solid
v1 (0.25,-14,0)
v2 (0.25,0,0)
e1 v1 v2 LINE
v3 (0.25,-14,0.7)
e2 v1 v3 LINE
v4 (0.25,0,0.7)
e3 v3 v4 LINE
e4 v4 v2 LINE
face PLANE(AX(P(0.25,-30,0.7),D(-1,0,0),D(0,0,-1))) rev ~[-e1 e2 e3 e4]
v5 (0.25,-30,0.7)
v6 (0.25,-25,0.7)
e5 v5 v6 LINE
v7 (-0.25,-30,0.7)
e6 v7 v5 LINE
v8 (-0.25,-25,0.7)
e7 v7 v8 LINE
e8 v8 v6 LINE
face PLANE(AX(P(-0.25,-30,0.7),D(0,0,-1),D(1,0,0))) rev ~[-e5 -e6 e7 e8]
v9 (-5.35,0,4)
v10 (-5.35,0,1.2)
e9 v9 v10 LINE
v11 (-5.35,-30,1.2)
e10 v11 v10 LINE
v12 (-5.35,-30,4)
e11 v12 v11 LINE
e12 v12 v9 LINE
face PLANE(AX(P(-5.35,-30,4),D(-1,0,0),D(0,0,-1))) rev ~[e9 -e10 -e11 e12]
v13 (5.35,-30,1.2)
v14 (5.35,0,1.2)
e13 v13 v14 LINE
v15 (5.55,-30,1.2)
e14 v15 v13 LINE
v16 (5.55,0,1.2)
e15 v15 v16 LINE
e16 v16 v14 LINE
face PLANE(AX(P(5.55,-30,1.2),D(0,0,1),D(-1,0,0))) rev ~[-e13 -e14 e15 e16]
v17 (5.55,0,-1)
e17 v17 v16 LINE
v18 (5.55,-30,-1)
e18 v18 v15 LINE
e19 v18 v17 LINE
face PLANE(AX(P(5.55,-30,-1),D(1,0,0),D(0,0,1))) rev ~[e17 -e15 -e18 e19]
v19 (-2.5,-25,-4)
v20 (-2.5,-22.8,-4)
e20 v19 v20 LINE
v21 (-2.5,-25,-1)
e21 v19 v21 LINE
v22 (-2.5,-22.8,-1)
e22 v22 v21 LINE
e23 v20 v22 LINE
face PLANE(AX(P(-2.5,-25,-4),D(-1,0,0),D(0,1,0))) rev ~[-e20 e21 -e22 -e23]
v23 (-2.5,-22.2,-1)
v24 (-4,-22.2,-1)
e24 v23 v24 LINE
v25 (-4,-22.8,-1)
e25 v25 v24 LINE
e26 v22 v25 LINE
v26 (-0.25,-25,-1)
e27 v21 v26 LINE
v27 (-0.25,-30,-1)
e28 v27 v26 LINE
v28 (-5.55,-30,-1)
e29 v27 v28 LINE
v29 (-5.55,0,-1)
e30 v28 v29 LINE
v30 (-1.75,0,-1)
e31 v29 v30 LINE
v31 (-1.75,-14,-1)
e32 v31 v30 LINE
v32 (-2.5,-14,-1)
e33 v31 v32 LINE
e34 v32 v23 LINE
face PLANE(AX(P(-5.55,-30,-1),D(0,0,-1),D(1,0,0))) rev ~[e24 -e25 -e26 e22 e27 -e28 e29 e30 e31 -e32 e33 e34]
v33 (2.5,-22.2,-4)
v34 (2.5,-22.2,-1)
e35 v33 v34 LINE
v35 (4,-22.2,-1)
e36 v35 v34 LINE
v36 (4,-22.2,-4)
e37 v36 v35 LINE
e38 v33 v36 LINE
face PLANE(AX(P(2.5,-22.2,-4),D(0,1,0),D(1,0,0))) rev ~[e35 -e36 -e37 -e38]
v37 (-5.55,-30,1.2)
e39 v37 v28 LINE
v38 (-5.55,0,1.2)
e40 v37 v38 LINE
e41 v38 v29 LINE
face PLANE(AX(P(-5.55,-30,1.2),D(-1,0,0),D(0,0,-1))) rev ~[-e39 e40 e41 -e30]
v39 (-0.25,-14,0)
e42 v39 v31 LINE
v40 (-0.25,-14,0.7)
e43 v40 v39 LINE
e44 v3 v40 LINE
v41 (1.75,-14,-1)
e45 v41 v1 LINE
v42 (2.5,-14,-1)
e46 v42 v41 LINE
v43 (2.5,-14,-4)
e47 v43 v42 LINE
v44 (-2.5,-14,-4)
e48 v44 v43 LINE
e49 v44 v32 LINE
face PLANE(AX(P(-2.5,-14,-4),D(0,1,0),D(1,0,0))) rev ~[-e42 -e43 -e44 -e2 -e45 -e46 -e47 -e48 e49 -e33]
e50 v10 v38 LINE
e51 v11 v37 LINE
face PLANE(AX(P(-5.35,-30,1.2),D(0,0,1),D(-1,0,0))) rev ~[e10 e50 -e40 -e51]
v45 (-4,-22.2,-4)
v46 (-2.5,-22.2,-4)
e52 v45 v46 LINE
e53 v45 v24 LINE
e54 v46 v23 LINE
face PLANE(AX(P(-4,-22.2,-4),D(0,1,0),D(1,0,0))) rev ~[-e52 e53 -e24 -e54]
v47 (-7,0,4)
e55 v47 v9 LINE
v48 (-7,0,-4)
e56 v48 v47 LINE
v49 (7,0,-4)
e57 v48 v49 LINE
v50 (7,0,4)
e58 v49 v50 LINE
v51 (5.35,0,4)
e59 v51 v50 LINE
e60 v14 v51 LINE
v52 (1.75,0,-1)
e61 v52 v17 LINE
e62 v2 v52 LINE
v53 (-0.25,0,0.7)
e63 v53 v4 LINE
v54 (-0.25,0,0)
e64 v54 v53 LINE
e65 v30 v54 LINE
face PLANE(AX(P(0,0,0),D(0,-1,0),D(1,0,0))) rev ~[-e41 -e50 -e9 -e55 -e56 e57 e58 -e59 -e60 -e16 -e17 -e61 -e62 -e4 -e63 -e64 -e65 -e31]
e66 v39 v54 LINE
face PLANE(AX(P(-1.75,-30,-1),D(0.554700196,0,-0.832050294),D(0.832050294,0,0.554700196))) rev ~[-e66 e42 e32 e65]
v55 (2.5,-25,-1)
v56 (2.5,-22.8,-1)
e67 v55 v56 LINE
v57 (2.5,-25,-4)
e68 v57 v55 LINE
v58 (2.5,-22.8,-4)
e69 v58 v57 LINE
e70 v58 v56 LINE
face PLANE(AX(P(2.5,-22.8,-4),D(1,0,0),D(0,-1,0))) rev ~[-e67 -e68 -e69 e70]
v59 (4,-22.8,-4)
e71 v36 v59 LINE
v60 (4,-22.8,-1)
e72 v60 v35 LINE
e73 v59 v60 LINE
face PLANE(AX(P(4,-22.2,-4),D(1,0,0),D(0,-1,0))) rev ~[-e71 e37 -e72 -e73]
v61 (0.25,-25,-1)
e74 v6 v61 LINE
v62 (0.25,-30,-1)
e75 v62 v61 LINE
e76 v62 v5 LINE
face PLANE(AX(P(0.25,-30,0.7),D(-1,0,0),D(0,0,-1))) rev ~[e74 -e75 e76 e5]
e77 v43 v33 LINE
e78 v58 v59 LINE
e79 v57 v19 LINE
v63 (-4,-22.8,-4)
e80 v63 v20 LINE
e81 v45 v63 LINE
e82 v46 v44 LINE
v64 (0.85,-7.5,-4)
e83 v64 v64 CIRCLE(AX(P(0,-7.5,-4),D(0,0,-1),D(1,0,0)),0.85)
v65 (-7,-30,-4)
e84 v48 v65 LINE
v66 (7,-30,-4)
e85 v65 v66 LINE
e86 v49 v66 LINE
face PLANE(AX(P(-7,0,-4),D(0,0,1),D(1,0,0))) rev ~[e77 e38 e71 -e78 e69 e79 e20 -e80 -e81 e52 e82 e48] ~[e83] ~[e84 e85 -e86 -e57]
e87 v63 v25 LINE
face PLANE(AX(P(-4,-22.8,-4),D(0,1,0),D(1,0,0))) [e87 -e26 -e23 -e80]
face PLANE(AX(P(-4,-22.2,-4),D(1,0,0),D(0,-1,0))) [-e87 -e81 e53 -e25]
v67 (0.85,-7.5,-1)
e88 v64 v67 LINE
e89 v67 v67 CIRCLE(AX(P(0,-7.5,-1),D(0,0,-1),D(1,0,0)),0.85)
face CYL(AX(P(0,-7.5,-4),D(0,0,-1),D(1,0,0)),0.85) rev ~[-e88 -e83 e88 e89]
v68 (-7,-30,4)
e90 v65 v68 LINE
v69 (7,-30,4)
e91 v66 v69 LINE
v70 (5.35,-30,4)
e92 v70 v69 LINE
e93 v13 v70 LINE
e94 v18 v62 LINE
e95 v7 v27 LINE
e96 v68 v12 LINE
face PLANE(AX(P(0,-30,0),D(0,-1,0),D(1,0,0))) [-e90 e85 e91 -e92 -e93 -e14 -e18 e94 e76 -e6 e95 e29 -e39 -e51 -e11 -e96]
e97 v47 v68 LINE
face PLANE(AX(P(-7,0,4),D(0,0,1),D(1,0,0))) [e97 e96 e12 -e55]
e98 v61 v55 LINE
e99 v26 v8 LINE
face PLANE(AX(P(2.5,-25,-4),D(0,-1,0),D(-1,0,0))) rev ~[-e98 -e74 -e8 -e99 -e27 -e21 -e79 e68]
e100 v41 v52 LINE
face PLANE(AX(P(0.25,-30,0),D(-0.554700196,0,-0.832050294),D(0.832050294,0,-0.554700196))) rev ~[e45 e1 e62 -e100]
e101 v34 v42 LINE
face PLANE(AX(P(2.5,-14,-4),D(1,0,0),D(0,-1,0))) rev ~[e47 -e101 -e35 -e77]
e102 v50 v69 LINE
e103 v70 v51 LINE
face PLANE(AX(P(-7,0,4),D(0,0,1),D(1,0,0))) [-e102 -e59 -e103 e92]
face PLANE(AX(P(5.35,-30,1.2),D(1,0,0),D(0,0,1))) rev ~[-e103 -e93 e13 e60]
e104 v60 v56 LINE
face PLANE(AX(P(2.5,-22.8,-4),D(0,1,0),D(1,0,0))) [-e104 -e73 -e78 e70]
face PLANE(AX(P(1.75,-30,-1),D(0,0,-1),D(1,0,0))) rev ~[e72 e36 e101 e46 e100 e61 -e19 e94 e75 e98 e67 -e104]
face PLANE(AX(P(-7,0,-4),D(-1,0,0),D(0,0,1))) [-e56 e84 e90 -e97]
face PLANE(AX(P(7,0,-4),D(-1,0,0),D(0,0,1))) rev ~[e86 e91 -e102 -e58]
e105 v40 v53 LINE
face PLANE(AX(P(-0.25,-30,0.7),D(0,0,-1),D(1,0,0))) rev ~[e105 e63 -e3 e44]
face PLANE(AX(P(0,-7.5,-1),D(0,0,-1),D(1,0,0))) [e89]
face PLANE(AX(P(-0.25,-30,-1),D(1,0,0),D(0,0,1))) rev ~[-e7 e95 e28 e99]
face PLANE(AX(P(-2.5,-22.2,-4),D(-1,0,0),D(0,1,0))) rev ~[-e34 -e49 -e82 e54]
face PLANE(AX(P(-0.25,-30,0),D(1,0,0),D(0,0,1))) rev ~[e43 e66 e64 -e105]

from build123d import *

# Parameters (mm, degrees)
F0_W     = 14
F0_H     = 8
F1_DEPTH = 30
F3_W     = 1.5
F3_H     = 0.6
F4_DEPTH = 8
F5_DEPTH = 30.001
F7_DEPTH = 5
F8_R     = 0.85
F9_DEPTH = 3


# Not quite as in the source:
# - a feature names something its author has since deleted; it is built from what else it names


with BuildPart() as f1:
    # F0 (on Front) → F1 (new body)
    with BuildSketch(Plane.XZ):
        Rectangle(F0_W, F0_H)
    extrude(amount=F1_DEPTH)

    # F3 (on face) → F4 (cut, through all)
    with BuildSketch(Plane(origin=(0, 0, -4), x_dir=(1, 0, 0), z_dir=(0, 0, -1))):
        with Locations((3.25, 22.5)):
            Rectangle(F3_W, F3_H)
        Polygon((-2.5, 14), (2.5, 14), (2.5, 22.2), (2.5, 22.8), (2.5, 25), (-2.5, 25), (-2.5, 22.8), (-2.5, 22.2), align=None)
        with Locations((-3.25, 22.5)):
            Rectangle(F3_W, F3_H)
    extrude(amount=-F4_DEPTH, mode=Mode.SUBTRACT)

    # F2 (on face) → F5 (cut, through all)
    with BuildSketch(Plane.XZ.offset(30)):
        Polygon((-0.25, 0), (-0.25, 0.7), (0.25, 0.7), (0.25, 0), (1.75, -1), (5.55, -1), (5.55, 1.2), (5.35, 1.2), (5.35, 4), (-5.35, 4), (-5.35, 1.2), (-5.55, 1.2), (-5.55, -1), (-1.75, -1), align=None)
    extrude(amount=-F5_DEPTH, mode=Mode.SUBTRACT)

    # F6 (on face) → F7 (cut, through all)
    with BuildSketch(Plane.XZ.offset(30)):
        Polygon((-0.25, -1), (-0.25, 0), (-1.75, -1), align=None)
        Polygon((1.75, -1), (0.25, 0), (0.25, -1), align=None)
    extrude(amount=-F7_DEPTH, mode=Mode.SUBTRACT)

    # F8 (on face) → F9 (cut)
    with BuildSketch(Plane(origin=(0, 0, -4), x_dir=(1, 0, 0), z_dir=(0, 0, -1))):
        with Locations((0, 7.5)):
            Circle(F8_R)
    extrude(amount=-F9_DEPTH, mode=Mode.SUBTRACT)


solid = f1.part
